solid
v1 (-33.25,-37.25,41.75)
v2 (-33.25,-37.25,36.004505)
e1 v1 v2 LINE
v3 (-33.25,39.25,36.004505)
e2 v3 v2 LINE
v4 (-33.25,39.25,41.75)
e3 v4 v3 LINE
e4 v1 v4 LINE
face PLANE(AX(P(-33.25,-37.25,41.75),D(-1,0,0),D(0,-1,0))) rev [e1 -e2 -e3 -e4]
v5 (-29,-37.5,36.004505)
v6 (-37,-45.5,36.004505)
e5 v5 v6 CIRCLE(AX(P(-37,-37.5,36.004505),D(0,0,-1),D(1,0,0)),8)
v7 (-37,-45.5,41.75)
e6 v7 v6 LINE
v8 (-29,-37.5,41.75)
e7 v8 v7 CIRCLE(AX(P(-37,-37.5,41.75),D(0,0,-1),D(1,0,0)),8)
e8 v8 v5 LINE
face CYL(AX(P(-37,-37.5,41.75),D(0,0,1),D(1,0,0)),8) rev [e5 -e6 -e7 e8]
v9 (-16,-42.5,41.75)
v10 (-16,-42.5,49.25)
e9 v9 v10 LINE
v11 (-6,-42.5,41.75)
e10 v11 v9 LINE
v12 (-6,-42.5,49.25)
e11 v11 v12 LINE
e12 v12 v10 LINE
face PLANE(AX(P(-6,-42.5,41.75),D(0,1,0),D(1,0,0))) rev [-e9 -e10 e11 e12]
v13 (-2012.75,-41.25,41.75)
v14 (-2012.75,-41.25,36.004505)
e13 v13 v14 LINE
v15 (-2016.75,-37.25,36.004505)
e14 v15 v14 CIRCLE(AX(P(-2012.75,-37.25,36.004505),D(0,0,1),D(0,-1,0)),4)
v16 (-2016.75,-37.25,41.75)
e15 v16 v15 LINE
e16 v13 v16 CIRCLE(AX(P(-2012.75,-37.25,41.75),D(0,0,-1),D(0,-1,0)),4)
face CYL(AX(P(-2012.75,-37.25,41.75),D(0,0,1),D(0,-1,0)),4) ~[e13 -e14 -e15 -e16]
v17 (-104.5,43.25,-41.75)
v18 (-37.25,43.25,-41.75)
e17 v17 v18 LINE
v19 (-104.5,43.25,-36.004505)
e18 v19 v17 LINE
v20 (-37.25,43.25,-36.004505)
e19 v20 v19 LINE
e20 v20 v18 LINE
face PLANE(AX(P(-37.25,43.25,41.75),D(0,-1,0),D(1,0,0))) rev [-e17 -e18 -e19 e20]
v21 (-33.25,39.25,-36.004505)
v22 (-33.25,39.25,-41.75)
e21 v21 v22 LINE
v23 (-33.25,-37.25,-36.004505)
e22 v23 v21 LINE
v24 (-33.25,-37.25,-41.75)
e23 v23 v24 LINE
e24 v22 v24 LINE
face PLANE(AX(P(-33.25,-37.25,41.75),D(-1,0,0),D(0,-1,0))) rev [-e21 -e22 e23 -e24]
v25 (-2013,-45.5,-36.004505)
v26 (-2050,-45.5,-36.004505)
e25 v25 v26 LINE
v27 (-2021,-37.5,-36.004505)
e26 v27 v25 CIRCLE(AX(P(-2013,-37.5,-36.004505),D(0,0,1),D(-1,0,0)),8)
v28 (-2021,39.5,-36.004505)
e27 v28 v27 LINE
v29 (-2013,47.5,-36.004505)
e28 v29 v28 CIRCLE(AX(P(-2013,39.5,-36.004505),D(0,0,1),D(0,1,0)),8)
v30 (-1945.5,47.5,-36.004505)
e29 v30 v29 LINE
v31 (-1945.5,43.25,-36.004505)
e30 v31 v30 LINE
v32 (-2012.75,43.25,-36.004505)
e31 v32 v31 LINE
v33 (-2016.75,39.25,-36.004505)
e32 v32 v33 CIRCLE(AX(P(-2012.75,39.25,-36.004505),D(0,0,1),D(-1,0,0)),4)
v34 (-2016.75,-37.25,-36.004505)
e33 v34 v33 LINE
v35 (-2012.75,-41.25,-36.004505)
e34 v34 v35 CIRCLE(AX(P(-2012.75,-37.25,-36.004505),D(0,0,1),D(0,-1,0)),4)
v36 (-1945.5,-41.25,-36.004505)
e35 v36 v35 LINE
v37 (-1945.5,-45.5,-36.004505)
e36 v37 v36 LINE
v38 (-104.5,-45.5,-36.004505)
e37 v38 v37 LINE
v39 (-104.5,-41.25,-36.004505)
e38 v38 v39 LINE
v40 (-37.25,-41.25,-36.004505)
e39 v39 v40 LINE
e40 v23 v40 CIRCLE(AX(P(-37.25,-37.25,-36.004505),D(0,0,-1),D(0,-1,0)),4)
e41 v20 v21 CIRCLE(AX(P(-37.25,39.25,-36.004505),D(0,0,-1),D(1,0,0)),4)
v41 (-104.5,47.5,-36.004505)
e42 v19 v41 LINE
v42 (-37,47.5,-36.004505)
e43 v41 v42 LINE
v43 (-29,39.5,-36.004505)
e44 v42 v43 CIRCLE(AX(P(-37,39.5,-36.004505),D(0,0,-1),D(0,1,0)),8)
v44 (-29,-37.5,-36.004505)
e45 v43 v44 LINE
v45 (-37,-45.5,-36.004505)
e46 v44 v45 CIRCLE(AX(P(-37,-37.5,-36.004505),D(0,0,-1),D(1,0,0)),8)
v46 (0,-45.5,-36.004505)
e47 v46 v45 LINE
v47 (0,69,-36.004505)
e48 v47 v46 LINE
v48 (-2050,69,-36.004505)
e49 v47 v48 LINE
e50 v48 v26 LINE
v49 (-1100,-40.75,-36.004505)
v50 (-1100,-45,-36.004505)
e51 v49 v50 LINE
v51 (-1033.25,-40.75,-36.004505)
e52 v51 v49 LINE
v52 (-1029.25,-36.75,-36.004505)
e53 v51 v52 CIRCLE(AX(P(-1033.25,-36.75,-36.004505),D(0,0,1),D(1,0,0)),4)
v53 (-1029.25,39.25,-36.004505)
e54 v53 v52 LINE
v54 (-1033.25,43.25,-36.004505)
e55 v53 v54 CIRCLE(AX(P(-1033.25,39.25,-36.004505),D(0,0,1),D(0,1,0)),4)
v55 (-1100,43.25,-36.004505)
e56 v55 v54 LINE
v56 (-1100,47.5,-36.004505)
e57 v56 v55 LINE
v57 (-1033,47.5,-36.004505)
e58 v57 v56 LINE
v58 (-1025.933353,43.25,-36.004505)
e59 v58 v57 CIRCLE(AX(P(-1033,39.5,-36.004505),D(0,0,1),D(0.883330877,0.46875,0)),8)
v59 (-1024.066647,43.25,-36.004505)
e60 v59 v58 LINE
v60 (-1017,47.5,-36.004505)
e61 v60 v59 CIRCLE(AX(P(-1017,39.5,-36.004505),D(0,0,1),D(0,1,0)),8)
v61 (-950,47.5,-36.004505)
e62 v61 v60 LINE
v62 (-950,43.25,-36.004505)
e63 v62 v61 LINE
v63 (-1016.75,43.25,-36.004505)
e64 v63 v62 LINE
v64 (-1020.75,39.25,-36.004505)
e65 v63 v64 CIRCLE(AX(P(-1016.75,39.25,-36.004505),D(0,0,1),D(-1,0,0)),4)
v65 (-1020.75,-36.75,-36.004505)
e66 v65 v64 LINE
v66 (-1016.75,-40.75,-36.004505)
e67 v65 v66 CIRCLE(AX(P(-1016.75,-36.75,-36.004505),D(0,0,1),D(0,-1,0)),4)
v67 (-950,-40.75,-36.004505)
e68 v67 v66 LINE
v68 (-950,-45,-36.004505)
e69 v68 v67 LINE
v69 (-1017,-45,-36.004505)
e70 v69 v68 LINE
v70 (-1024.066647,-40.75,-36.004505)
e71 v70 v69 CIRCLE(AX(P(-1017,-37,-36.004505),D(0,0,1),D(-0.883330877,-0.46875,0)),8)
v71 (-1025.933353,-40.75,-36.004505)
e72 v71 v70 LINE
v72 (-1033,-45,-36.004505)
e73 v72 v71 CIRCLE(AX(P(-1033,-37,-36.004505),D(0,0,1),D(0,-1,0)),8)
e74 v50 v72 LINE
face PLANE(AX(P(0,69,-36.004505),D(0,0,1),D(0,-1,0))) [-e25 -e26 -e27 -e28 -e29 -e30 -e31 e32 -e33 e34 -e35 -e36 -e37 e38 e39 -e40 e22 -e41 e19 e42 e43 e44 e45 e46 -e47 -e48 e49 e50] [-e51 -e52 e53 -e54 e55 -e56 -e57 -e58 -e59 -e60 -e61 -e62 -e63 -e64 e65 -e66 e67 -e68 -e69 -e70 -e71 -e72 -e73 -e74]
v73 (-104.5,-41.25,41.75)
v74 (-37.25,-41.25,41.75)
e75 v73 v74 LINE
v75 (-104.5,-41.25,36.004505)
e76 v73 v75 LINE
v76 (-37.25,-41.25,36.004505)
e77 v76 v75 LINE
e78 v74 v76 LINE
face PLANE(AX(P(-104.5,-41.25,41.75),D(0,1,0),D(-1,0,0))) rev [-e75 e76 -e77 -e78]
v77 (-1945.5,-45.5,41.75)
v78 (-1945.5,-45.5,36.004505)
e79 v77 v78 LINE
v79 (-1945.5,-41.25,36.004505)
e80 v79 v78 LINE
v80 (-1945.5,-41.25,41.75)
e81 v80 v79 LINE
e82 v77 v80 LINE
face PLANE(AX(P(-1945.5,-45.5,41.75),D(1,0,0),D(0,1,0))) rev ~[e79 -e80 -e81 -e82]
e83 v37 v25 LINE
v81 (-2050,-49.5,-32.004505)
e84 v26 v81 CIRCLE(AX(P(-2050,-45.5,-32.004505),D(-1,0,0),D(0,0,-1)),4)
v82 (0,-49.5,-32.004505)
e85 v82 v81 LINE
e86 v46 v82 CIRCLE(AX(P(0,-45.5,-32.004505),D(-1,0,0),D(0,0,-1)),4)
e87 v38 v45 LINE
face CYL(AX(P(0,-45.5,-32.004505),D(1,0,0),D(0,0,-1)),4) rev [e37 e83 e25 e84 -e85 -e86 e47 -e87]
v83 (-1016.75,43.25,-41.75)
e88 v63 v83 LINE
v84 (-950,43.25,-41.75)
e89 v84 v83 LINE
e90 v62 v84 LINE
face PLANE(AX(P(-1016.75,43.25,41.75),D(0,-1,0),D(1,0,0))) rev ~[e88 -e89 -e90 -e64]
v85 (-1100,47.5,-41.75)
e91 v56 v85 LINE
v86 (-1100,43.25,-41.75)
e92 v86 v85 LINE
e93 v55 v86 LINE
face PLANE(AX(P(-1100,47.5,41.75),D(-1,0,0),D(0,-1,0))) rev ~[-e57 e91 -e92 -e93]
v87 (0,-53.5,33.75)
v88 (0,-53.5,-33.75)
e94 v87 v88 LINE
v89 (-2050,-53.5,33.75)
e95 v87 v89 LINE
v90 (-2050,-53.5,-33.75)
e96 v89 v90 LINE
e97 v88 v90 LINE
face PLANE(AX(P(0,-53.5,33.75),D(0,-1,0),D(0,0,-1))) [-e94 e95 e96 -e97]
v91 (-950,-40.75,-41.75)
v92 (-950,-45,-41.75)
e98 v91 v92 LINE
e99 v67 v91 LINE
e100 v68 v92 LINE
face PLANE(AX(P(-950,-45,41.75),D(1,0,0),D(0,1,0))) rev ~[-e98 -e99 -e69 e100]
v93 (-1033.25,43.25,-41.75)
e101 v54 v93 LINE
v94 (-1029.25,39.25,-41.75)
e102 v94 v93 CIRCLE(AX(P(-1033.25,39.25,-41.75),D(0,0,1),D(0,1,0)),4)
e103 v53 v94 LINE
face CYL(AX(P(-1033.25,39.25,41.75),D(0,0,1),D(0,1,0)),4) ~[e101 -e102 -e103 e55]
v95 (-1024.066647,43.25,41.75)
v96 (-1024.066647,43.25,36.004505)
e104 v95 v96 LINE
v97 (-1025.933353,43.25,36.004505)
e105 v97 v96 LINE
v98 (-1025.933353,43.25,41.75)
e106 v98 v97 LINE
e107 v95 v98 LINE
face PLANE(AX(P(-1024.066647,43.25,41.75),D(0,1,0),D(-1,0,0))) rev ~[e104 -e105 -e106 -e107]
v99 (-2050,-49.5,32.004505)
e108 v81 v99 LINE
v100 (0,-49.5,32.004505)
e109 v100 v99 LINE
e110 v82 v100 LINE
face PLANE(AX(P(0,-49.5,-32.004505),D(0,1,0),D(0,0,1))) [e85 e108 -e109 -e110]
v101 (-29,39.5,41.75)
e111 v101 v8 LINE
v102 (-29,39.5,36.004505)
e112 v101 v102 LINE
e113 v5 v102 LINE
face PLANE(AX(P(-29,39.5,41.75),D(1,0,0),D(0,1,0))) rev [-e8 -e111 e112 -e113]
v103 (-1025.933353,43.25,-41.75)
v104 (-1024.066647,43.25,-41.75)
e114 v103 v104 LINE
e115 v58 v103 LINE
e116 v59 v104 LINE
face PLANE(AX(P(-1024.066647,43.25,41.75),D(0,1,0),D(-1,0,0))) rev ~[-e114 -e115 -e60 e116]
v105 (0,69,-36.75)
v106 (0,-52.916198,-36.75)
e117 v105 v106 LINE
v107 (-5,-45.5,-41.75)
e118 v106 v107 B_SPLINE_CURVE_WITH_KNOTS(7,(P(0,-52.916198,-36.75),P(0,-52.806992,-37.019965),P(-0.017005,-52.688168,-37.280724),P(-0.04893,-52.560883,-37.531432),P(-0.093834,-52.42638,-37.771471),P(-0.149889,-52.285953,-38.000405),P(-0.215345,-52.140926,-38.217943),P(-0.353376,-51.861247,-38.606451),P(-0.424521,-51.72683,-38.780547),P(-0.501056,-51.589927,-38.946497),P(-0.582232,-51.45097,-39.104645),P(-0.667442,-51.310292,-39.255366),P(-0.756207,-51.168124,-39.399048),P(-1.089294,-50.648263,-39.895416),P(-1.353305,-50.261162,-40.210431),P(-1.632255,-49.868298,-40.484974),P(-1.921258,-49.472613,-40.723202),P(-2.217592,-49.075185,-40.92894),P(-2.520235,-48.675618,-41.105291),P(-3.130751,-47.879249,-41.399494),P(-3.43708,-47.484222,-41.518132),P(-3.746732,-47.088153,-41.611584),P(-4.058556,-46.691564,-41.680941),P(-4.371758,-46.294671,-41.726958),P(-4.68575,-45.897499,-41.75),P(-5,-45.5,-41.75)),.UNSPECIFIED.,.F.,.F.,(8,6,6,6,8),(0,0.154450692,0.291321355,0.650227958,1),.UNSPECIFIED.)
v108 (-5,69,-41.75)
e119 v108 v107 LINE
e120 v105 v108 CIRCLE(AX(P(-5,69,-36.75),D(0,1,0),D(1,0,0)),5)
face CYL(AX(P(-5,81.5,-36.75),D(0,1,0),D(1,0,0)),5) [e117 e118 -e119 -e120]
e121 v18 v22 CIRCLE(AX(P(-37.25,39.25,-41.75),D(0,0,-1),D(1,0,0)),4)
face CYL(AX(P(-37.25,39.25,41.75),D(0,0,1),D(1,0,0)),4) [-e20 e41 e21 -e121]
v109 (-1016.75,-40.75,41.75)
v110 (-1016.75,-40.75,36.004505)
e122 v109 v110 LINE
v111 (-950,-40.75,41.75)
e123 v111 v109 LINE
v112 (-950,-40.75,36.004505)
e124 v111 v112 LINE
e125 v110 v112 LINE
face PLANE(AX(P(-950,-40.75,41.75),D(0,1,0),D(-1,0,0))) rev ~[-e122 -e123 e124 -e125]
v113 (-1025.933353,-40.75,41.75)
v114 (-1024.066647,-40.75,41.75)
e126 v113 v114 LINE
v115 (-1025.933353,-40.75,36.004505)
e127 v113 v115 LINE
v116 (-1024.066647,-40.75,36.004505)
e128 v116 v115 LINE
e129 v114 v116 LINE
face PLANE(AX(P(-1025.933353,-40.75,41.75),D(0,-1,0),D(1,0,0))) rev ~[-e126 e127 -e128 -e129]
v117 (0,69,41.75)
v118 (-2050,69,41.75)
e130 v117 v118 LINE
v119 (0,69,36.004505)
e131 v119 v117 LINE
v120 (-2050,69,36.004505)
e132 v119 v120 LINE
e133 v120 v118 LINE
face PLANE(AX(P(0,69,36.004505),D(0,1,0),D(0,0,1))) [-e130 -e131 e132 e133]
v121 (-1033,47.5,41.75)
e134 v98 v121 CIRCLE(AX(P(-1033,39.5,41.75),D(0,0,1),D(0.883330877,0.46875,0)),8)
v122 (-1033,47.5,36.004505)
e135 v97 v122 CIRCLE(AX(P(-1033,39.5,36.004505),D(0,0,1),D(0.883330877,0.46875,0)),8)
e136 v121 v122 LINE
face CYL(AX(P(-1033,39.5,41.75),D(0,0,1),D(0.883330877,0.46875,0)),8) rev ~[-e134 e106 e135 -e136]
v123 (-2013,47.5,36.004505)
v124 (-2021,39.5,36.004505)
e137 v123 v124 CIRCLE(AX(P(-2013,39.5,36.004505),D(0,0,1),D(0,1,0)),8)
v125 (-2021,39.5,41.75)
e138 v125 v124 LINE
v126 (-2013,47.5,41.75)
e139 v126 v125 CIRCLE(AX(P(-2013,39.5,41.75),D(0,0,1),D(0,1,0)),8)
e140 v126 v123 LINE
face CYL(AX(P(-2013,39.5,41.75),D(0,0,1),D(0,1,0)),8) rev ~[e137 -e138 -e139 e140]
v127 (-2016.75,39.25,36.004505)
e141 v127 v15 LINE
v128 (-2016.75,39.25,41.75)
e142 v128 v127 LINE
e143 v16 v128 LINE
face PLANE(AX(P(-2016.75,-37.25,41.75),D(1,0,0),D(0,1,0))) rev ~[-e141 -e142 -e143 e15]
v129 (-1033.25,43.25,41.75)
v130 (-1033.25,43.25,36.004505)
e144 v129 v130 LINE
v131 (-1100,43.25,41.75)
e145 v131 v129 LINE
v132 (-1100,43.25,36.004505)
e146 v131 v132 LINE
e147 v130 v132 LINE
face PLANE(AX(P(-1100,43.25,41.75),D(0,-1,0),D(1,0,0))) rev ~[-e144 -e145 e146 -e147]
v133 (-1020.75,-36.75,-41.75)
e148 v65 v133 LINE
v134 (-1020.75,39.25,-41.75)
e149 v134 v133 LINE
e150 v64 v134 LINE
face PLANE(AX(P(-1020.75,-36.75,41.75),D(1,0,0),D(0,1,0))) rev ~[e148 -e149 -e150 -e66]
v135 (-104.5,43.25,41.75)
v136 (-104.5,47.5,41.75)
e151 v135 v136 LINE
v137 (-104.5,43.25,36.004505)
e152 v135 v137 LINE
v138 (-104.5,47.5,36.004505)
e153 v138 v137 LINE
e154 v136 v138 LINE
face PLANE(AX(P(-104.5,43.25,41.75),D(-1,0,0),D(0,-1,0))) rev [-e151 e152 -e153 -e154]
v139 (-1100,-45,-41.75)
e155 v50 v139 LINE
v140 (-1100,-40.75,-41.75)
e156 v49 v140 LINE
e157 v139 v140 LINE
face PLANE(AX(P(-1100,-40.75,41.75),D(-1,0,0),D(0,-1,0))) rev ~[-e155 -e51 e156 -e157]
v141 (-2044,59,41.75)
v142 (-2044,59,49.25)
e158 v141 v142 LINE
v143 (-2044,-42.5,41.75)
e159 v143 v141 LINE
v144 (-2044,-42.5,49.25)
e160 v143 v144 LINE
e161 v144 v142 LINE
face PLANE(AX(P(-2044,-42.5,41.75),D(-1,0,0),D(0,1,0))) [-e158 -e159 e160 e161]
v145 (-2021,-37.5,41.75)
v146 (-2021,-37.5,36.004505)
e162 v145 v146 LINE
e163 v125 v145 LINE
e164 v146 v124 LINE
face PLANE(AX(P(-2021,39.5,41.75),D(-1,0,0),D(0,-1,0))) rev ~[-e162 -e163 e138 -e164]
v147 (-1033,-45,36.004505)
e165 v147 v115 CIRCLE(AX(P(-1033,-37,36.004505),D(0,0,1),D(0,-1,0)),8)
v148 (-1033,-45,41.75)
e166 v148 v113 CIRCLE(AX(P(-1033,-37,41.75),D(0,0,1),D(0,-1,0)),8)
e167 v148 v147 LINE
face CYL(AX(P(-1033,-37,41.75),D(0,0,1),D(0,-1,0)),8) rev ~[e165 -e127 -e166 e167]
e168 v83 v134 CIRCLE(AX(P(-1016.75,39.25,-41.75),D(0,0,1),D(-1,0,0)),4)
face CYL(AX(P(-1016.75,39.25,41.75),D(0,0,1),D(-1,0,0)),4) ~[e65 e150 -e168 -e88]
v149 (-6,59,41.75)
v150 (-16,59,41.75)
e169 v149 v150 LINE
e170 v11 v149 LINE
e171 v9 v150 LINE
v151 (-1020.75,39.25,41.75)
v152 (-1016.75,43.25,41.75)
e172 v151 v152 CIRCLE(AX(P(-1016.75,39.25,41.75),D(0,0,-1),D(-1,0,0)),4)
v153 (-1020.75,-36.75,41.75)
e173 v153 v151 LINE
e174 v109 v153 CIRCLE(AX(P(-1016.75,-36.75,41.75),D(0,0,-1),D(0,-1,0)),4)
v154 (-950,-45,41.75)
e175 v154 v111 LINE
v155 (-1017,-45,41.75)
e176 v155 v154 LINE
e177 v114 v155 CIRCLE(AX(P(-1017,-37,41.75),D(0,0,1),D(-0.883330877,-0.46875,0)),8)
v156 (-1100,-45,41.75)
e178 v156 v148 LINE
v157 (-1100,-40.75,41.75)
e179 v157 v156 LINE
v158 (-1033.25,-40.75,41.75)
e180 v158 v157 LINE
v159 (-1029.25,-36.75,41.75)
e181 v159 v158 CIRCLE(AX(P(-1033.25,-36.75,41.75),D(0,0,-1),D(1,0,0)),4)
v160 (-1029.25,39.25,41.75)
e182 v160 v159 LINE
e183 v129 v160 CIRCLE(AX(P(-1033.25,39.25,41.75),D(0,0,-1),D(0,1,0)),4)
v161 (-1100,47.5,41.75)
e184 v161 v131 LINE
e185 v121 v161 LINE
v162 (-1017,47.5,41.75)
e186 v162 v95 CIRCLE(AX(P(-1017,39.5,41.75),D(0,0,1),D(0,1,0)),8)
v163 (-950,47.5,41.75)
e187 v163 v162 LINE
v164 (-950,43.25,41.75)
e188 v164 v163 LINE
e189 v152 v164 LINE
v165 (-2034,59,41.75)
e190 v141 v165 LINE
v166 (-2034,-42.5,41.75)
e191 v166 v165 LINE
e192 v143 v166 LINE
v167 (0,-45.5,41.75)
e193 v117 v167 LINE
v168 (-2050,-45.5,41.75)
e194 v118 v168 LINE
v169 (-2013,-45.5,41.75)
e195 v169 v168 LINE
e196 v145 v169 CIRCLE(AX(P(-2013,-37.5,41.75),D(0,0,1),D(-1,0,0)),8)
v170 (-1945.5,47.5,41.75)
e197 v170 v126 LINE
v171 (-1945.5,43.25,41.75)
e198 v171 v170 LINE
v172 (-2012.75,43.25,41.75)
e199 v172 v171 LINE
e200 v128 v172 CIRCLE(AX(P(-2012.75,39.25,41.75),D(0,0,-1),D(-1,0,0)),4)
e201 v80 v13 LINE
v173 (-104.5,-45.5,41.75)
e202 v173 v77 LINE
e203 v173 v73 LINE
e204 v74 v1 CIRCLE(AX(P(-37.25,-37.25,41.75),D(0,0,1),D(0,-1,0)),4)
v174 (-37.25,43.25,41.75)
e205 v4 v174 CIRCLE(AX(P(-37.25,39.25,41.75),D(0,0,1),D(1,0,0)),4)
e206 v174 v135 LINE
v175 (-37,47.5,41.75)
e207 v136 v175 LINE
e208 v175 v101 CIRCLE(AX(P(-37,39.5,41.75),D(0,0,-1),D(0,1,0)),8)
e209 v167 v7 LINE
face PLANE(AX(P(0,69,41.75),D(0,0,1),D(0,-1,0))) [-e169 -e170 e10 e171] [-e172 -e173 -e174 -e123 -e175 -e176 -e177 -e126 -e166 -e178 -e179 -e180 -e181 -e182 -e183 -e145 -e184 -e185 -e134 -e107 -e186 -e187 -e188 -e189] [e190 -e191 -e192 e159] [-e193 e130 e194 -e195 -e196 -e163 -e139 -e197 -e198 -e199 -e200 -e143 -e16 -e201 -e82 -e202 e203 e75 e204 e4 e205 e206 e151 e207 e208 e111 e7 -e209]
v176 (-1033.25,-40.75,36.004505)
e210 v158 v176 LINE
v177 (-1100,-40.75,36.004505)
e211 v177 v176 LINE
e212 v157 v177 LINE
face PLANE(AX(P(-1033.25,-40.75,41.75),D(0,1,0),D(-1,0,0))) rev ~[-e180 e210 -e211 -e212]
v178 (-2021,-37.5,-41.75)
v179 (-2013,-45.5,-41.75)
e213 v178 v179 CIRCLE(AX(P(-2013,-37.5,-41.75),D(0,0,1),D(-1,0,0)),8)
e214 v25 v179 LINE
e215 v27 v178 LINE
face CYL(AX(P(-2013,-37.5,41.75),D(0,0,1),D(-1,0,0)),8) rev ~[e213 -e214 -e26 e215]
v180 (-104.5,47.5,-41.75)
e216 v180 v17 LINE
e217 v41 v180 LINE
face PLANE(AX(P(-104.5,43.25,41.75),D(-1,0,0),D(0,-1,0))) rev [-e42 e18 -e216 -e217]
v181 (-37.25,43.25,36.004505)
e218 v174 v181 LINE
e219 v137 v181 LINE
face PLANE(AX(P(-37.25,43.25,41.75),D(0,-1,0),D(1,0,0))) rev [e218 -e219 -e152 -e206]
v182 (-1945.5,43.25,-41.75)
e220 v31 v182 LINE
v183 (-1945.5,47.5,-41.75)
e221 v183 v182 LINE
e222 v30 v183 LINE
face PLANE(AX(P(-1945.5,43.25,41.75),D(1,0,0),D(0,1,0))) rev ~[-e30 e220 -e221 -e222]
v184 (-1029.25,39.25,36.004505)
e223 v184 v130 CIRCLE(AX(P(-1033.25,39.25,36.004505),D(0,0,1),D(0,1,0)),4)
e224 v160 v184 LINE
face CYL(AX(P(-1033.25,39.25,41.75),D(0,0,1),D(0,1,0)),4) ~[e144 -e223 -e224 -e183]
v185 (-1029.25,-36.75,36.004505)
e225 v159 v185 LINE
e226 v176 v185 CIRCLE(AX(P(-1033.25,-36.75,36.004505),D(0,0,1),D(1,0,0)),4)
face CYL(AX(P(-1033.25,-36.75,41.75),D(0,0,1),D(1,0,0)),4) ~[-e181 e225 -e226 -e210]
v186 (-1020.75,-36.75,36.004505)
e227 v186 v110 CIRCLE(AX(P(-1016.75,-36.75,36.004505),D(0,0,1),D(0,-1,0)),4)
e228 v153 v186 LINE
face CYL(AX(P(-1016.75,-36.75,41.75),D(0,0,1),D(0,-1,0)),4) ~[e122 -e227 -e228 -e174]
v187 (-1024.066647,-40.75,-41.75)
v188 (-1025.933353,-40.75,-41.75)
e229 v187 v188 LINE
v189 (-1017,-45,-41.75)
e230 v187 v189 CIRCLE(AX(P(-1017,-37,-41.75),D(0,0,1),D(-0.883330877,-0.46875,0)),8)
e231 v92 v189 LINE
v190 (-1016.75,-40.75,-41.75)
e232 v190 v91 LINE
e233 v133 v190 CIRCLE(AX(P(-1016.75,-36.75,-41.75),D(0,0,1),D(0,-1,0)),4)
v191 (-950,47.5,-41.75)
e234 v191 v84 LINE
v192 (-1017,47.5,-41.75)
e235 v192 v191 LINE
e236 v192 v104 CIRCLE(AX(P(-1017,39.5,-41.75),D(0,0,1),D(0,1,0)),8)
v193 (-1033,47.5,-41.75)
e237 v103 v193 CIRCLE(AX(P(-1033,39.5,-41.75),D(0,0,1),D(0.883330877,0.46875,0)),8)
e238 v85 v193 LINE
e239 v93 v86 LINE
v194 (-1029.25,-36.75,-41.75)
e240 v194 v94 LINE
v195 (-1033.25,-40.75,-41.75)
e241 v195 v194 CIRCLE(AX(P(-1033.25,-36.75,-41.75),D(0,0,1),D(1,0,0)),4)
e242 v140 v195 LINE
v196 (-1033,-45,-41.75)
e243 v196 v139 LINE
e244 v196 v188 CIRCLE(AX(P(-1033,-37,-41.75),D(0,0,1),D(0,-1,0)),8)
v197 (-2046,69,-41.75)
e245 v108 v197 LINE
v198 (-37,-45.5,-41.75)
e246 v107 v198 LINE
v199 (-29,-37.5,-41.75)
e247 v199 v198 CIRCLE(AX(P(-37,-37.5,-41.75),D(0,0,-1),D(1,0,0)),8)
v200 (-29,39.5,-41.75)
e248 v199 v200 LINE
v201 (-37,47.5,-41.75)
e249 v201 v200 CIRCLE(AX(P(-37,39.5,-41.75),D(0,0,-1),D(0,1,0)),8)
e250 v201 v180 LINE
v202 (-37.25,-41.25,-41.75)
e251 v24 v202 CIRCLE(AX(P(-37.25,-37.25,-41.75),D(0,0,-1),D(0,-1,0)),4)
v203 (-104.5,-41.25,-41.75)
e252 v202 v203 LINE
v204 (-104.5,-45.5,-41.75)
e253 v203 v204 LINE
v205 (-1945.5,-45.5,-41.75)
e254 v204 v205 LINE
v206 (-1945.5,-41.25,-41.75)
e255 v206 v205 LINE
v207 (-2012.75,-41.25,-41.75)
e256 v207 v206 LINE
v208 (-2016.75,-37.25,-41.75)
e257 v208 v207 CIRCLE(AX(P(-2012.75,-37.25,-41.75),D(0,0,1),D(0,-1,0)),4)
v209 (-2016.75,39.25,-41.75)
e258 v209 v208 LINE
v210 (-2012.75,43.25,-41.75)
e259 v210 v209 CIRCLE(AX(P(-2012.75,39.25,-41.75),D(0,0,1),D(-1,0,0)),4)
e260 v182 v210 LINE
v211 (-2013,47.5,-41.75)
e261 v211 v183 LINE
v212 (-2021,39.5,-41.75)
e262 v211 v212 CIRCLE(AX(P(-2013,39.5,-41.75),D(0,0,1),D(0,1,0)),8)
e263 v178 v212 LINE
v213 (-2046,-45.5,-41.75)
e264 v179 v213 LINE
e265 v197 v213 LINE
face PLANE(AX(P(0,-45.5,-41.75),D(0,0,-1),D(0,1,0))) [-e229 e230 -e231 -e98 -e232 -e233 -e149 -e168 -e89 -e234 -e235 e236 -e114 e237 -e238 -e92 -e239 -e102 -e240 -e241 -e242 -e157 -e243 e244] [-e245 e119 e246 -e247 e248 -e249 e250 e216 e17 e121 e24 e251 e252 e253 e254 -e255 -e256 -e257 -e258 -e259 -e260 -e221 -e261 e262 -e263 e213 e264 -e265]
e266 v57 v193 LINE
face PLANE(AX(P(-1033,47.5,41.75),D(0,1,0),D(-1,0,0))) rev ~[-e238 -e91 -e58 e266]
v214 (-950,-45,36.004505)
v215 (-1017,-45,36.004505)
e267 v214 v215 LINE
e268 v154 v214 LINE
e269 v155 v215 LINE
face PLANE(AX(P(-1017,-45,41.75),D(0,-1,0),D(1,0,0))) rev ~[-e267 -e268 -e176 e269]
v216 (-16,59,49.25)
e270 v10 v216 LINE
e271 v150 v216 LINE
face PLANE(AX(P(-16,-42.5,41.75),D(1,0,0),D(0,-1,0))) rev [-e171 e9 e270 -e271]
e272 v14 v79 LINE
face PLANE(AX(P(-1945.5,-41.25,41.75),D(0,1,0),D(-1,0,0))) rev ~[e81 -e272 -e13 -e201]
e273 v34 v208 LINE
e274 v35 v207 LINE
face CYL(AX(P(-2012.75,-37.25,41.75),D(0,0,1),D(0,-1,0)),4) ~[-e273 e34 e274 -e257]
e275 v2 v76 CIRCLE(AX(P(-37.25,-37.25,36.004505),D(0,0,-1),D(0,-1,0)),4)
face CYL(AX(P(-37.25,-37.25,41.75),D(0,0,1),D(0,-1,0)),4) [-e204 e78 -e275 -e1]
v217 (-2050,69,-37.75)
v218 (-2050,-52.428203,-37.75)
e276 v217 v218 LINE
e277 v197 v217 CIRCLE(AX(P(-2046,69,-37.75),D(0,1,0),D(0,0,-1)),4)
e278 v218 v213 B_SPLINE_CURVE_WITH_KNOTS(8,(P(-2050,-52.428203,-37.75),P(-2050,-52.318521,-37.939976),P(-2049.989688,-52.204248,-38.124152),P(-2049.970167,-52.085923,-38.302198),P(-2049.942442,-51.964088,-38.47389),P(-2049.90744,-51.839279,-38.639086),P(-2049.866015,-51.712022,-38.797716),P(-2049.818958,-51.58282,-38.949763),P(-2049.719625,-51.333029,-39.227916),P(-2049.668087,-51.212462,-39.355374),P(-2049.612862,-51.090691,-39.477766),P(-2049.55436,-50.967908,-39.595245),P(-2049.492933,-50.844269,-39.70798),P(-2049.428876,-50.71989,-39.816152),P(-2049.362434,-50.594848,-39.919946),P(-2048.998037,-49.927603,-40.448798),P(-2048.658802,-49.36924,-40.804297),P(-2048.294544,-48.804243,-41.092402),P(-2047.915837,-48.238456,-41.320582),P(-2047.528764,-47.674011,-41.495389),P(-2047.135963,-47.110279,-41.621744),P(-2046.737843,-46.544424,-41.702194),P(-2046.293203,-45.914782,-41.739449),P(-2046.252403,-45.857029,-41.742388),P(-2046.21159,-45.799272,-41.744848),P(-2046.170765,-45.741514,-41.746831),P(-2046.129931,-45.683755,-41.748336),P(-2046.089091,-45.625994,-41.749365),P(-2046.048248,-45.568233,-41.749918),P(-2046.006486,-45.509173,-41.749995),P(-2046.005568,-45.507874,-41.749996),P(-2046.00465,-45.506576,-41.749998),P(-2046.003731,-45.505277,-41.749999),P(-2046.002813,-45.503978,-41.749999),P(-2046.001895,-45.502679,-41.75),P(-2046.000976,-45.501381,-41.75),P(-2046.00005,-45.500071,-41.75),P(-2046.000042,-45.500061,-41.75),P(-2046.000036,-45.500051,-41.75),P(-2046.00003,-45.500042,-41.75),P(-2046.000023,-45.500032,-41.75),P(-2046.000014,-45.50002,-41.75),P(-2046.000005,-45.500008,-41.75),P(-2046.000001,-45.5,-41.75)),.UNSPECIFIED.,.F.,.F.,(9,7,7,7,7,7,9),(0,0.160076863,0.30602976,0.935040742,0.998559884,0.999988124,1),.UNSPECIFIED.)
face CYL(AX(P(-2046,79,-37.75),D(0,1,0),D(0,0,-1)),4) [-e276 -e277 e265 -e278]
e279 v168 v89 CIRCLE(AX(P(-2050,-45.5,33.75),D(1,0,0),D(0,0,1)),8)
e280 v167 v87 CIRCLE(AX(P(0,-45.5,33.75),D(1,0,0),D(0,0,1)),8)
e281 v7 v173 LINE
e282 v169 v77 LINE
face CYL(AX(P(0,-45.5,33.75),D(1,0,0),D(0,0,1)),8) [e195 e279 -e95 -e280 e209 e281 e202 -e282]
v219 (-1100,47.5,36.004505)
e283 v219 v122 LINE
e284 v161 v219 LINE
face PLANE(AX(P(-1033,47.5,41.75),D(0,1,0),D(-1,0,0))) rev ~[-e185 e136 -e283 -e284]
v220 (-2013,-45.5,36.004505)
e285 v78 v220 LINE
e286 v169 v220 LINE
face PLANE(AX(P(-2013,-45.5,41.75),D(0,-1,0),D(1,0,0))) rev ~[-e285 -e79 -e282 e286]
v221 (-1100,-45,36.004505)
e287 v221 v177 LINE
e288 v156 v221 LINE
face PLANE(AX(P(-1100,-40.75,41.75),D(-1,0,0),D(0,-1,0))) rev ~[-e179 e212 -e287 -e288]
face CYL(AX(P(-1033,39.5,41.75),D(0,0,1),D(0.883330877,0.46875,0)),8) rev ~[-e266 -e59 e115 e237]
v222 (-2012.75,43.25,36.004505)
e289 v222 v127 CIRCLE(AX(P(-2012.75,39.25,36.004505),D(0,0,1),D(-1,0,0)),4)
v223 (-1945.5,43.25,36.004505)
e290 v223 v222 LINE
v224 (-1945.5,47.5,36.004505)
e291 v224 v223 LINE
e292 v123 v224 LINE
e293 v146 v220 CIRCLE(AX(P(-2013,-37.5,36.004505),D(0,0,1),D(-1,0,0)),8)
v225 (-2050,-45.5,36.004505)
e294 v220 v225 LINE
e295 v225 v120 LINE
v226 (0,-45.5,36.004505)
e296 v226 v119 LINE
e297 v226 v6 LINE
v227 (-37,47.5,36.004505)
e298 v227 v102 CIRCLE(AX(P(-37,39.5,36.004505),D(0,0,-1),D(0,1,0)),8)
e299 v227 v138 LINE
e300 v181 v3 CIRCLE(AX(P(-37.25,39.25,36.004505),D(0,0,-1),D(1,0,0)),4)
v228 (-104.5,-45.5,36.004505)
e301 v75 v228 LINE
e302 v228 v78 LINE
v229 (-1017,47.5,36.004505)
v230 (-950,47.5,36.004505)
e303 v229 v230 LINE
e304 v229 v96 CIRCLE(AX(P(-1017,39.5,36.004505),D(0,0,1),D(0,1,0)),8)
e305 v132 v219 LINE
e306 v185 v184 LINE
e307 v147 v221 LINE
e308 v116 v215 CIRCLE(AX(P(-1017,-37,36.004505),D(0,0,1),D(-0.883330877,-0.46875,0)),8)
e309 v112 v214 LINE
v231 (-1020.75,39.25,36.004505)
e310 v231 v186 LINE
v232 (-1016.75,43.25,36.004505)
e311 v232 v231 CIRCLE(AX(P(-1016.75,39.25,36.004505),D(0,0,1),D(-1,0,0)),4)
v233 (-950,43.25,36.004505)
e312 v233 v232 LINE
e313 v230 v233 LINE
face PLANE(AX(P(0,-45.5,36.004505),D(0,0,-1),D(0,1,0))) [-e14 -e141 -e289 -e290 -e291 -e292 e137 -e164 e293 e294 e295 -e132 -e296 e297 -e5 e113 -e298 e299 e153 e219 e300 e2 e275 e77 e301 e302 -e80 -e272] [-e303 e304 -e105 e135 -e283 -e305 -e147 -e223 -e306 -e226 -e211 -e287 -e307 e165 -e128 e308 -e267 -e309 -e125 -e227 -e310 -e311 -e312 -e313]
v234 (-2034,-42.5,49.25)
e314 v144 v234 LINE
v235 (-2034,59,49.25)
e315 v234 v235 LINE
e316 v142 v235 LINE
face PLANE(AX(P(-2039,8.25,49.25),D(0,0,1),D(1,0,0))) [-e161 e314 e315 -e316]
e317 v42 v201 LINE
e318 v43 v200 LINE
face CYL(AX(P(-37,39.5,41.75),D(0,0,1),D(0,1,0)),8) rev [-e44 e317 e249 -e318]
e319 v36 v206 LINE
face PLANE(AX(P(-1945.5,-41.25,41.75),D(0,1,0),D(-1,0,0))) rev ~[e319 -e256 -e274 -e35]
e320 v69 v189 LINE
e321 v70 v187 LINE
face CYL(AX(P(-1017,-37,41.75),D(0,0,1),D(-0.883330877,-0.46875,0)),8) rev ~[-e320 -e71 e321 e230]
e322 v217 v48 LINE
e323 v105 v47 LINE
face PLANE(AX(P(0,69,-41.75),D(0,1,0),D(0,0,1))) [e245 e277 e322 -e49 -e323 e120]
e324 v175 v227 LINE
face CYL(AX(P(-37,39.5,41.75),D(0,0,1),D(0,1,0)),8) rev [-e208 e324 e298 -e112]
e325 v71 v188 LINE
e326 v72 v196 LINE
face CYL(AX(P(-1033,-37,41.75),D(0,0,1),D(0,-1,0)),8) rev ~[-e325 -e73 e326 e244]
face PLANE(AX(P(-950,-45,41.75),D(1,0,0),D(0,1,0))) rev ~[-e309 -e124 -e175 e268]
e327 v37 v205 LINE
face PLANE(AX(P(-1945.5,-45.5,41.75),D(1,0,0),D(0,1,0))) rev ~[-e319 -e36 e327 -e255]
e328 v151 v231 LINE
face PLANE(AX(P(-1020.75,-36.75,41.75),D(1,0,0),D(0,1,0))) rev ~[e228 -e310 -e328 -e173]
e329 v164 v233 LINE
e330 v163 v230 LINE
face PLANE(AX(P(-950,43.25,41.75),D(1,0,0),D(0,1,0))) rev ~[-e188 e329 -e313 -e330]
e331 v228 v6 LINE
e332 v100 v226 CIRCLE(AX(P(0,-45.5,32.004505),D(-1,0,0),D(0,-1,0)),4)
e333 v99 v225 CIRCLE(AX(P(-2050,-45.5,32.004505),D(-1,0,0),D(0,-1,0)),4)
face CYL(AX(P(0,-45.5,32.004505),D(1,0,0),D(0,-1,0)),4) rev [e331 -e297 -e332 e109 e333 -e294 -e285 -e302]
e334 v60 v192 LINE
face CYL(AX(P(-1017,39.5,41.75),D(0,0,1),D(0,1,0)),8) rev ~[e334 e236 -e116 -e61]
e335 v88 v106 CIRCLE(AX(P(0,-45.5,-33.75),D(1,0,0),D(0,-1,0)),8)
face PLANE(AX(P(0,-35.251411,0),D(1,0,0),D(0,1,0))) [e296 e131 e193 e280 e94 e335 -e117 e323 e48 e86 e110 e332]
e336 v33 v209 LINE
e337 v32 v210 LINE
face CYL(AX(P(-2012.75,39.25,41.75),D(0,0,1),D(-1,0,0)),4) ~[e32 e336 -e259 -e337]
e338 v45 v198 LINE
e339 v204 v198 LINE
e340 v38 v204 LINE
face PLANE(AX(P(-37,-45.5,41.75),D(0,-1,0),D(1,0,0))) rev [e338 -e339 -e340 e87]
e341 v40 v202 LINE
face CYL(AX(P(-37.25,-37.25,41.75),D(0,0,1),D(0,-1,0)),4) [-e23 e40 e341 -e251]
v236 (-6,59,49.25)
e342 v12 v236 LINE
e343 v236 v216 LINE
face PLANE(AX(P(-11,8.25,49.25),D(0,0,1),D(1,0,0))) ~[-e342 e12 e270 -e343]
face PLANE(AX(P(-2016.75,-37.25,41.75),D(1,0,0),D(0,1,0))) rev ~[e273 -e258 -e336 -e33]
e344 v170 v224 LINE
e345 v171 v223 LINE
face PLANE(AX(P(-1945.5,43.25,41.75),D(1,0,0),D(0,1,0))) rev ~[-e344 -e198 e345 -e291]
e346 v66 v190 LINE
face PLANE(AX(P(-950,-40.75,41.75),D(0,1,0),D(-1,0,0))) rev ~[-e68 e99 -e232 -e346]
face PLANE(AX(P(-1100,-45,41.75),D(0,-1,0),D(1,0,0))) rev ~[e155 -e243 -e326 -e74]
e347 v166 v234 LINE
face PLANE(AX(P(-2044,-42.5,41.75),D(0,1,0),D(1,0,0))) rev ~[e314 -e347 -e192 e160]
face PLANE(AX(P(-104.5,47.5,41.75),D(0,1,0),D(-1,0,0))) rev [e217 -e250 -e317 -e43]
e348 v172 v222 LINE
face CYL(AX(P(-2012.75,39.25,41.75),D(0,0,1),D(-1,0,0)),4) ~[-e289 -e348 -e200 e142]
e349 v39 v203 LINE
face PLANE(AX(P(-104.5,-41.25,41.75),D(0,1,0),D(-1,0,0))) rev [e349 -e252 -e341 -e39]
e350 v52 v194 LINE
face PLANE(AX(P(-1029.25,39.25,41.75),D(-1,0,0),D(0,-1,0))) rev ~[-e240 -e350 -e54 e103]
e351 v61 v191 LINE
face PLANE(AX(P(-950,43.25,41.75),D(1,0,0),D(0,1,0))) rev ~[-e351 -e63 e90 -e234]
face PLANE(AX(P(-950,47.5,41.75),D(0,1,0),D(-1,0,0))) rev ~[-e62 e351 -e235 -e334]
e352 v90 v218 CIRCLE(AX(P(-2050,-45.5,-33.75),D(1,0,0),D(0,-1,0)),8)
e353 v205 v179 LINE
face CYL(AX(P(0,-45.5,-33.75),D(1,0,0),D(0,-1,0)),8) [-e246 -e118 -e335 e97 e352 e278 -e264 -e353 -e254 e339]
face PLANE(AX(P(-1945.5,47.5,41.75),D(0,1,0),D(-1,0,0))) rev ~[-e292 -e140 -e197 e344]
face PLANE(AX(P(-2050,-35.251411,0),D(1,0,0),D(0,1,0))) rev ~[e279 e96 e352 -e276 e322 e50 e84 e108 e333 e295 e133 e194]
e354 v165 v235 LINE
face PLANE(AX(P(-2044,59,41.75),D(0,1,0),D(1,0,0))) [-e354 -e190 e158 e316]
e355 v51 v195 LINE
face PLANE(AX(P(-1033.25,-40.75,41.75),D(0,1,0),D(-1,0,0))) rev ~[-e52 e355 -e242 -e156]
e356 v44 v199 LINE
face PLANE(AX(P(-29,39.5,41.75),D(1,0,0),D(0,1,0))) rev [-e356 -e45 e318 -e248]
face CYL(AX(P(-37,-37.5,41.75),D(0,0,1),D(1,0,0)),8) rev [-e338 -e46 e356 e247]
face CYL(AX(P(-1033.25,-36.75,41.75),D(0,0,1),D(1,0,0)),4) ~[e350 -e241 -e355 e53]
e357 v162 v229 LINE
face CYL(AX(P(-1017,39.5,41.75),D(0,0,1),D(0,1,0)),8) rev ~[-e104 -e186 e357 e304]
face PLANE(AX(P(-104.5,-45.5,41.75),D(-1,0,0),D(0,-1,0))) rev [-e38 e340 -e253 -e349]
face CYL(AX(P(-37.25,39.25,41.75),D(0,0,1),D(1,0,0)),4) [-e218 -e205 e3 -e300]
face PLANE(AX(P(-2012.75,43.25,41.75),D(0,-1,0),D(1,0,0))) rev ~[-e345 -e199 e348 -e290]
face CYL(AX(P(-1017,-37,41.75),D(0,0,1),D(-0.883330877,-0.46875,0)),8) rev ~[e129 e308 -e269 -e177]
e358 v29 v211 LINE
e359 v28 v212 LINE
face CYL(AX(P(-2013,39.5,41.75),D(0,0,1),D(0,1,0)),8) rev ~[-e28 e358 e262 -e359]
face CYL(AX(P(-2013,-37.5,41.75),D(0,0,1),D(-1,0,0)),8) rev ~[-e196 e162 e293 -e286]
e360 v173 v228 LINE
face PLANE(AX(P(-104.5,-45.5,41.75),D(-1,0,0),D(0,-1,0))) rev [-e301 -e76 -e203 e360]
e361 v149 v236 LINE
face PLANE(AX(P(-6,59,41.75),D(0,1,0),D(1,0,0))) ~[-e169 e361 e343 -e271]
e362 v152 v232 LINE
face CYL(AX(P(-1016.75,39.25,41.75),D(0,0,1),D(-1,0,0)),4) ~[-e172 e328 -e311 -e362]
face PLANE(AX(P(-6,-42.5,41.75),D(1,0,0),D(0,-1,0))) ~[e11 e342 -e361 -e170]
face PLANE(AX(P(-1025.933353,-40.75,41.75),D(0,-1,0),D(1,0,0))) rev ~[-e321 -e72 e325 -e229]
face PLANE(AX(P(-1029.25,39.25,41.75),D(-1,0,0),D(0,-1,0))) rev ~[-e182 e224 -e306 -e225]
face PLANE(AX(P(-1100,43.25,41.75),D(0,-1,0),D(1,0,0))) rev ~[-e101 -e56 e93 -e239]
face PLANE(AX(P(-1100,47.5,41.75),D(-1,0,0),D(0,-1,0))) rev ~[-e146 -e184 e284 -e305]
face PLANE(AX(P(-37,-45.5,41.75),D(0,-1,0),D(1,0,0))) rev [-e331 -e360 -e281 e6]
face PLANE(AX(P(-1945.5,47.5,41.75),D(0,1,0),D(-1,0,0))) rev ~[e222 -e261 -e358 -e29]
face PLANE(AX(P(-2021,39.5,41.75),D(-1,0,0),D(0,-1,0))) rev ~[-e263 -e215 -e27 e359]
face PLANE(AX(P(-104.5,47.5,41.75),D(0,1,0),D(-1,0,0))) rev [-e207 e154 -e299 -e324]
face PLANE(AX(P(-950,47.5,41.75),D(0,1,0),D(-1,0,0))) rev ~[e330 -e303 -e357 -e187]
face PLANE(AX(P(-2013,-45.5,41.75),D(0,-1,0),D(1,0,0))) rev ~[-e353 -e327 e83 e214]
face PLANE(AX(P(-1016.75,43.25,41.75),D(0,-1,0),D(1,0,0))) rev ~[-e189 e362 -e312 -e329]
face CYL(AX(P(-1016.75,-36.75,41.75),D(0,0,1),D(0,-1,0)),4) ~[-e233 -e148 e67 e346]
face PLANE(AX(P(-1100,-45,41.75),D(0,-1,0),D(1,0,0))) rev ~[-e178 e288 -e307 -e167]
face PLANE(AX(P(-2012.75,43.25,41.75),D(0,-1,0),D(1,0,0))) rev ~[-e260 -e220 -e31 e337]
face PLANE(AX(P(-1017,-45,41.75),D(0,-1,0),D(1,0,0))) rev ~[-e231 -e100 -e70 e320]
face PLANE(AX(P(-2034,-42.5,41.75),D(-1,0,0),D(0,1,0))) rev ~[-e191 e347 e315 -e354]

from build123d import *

# Parameters (mm, degrees)
F0_W         = 69
F0_H         = 5.7454954955
F1_DEPTH     = 2050
F2_W         = 10
F2_H         = 101.5
F3_DEPTH     = 7.5
F7_DEPTH     = 84
F10_DEPTH    = 90
F11_T1_DEPTH = 134.5
F12_T1_DEPTH = 139.5


# Not quite as in the source:
# - a fillet or chamfer that OpenCascade refuses, or shapes differently, is made with other operations: its cross-section is extruded or revolved along the edge and cut away or added


with BuildPart() as f1:
    # F0 (on Right) → F1 (new body)
    with BuildSketch(Plane.YZ):
        with BuildLine():
            ThreePointArc((-53.5, -33.75), (-51.1568542495, -39.4068542495), (-45.5, -41.75))
            Line((-45.5, -41.75), (0, -41.75))
            Line((0, -41.75), (0, -36.0045045045))
            Line((0, -36.0045045045), (-45.5, -36.0045045045))
            ThreePointArc((-45.5, -36.0045045045), (-48.3284271247, -34.8329316293), (-49.5, -32.0045045045))
            Line((-49.5, -32.0045045045), (-49.5, 32.0045045045))
            ThreePointArc((-49.5, 32.0045045045), (-48.3284271247, 34.8329316293), (-45.5, 36.0045045045))
            Line((-45.5, 36.0045045045), (0, 36.0045045045))
            Line((0, 36.0045045045), (0, 41.75))
            Line((0, 41.75), (-45.5, 41.75))
            ThreePointArc((-45.5, 41.75), (-51.1568542495, 39.4068542495), (-53.5, 33.75))
            Line((-53.5, 33.75), (-53.5, -33.75))
        make_face()
        with Locations((34.5, 38.8772522523)):
            Rectangle(F0_W, F0_H)
        with Locations((34.5, -38.8772522523)):
            Rectangle(F0_W, F0_H)
    extrude(amount=-F1_DEPTH)

    # F2 (on face) → F3 (join)
    with BuildSketch(Plane.XY.offset(41.75)):
        with Locations((-2039, 8.25)):
            Rectangle(F2_W, F2_H)
    extrude(amount=F3_DEPTH)

    # F5: F1 across plane


with BuildPart() as f1_1:
    add(f1.part)
    add(f1.part.mirror(Plane.YZ.offset(-1025)))

    # F6 (on face) → F7 (cut)
    with BuildSketch(Plane.XY.offset(41.75)):
        with BuildLine():
            Line((-2021, 39.5), (-2021, 0))
            Line((-2021, 0), (-2021, -37.5))
            ThreePointArc((-2021, -37.5), (-2018.6568542495, -43.1568542495), (-2013, -45.5))
            Line((-2013, -45.5), (-1945.5, -45.5))
            Line((-1945.5, -45.5), (-1945.5, -41.25))
            Line((-1945.5, -41.25), (-2004.9698543549, -41.25))
            Line((-2004.9698543549, -41.25), (-2012.75, -41.25))
            ThreePointArc((-2012.75, -41.25), (-2015.5784271247, -40.0784271247), (-2016.75, -37.25))
            Line((-2016.75, -37.25), (-2016.75, 0))
            Line((-2016.75, 0), (-2016.75, 39.25))
            ThreePointArc((-2016.75, 39.25), (-2015.5784271247, 42.0784271247), (-2012.75, 43.25))
            Line((-2012.75, 43.25), (-1945.5, 43.25))
            Line((-1945.5, 43.25), (-1945.5, 47.5))
            Line((-1945.5, 47.5), (-2013, 47.5))
            ThreePointArc((-2013, 47.5), (-2018.6568542495, 45.1568542495), (-2021, 39.5))
        make_face()
    extrude(amount=-F7_DEPTH, mode=Mode.SUBTRACT)

    # F8: F1 across plane


with BuildPart() as f1_2:
    add(f1_1.part)
    add(f1_1.part.mirror(Plane.YZ.offset(-1025)), mode=Mode.INTERSECT)

    # F9 (on face) → F10 (cut)
    with BuildSketch(Plane.XY.offset(41.75)):
        with BuildLine():
            ThreePointArc((-1024.0666470126, -40.75), (-1021.1231056256, -43.8556546004), (-1017, -45))
            Line((-1017, -45), (-950, -45))
            Line((-950, -45), (-950, -40.75))
            Line((-950, -40.75), (-1016.75, -40.75))
            ThreePointArc((-1016.75, -40.75), (-1019.5784271247, -39.5784271247), (-1020.75, -36.75))
            Line((-1020.75, -36.75), (-1020.75, 1.25))
            Line((-1020.75, 1.25), (-1020.75, 39.25))
            ThreePointArc((-1020.75, 39.25), (-1019.5784271247, 42.0784271247), (-1016.75, 43.25))
            Line((-1016.75, 43.25), (-950, 43.25))
            Line((-950, 43.25), (-950, 47.5))
            Line((-950, 47.5), (-1017, 47.5))
            ThreePointArc((-1017, 47.5), (-1021.1231056256, 46.3556546004), (-1024.0666470126, 43.25))
            Line((-1024.0666470126, 43.25), (-1025.9333529874, 43.25))
            ThreePointArc((-1025.9333529874, 43.25), (-1028.8768943744, 46.3556546004), (-1033, 47.5))
            Line((-1033, 47.5), (-1100, 47.5))
            Line((-1100, 47.5), (-1100, 43.25))
            Line((-1100, 43.25), (-1033.25, 43.25))
            ThreePointArc((-1033.25, 43.25), (-1030.4215728753, 42.0784271247), (-1029.25, 39.25))
            Line((-1029.25, 39.25), (-1029.25, 1.25))
            Line((-1029.25, 1.25), (-1029.25, -36.75))
            ThreePointArc((-1029.25, -36.75), (-1030.4215728753, -39.5784271247), (-1033.25, -40.75))
            Line((-1033.25, -40.75), (-1100, -40.75))
            Line((-1100, -40.75), (-1100, -45))
            Line((-1100, -45), (-1033, -45))
            ThreePointArc((-1033, -45), (-1028.8768943744, -43.8556546004), (-1025.9333529874, -40.75))
            Line((-1025.9333529874, -40.75), (-1024.0666470126, -40.75))
        make_face()
    extrude(amount=-F10_DEPTH, mode=Mode.SUBTRACT)

    # F11: fillet of radius 4 on 1 edges, made by hand

    # F11_s2 → F11_t1 (cut)
    with BuildSketch(Plane.XZ.offset(-79)):
        with BuildLine():
            ThreePointArc((-2046, -41.75), (-2048.8284271247, -40.5784271247), (-2050, -37.75))
            Line((-2050, -37.75), (-2050, -41.75))
            Line((-2050, -41.75), (-2046, -41.75))
        make_face()
    extrude(amount=F11_T1_DEPTH, mode=Mode.SUBTRACT)

    # F12: fillet of radius 5 on 1 edges, made by hand

    # F12_s2 → F12_t1 (cut)
    with BuildSketch(Plane.XZ.offset(-81.5)):
        with BuildLine():
            ThreePointArc((0, -36.75), (-1.4644660941, -40.2855339059), (-5, -41.75))
            Line((-5, -41.75), (0, -41.75))
            Line((0, -41.75), (0, -36.75))
        make_face()
    extrude(amount=F12_T1_DEPTH, mode=Mode.SUBTRACT)


solid = f1_2.part
